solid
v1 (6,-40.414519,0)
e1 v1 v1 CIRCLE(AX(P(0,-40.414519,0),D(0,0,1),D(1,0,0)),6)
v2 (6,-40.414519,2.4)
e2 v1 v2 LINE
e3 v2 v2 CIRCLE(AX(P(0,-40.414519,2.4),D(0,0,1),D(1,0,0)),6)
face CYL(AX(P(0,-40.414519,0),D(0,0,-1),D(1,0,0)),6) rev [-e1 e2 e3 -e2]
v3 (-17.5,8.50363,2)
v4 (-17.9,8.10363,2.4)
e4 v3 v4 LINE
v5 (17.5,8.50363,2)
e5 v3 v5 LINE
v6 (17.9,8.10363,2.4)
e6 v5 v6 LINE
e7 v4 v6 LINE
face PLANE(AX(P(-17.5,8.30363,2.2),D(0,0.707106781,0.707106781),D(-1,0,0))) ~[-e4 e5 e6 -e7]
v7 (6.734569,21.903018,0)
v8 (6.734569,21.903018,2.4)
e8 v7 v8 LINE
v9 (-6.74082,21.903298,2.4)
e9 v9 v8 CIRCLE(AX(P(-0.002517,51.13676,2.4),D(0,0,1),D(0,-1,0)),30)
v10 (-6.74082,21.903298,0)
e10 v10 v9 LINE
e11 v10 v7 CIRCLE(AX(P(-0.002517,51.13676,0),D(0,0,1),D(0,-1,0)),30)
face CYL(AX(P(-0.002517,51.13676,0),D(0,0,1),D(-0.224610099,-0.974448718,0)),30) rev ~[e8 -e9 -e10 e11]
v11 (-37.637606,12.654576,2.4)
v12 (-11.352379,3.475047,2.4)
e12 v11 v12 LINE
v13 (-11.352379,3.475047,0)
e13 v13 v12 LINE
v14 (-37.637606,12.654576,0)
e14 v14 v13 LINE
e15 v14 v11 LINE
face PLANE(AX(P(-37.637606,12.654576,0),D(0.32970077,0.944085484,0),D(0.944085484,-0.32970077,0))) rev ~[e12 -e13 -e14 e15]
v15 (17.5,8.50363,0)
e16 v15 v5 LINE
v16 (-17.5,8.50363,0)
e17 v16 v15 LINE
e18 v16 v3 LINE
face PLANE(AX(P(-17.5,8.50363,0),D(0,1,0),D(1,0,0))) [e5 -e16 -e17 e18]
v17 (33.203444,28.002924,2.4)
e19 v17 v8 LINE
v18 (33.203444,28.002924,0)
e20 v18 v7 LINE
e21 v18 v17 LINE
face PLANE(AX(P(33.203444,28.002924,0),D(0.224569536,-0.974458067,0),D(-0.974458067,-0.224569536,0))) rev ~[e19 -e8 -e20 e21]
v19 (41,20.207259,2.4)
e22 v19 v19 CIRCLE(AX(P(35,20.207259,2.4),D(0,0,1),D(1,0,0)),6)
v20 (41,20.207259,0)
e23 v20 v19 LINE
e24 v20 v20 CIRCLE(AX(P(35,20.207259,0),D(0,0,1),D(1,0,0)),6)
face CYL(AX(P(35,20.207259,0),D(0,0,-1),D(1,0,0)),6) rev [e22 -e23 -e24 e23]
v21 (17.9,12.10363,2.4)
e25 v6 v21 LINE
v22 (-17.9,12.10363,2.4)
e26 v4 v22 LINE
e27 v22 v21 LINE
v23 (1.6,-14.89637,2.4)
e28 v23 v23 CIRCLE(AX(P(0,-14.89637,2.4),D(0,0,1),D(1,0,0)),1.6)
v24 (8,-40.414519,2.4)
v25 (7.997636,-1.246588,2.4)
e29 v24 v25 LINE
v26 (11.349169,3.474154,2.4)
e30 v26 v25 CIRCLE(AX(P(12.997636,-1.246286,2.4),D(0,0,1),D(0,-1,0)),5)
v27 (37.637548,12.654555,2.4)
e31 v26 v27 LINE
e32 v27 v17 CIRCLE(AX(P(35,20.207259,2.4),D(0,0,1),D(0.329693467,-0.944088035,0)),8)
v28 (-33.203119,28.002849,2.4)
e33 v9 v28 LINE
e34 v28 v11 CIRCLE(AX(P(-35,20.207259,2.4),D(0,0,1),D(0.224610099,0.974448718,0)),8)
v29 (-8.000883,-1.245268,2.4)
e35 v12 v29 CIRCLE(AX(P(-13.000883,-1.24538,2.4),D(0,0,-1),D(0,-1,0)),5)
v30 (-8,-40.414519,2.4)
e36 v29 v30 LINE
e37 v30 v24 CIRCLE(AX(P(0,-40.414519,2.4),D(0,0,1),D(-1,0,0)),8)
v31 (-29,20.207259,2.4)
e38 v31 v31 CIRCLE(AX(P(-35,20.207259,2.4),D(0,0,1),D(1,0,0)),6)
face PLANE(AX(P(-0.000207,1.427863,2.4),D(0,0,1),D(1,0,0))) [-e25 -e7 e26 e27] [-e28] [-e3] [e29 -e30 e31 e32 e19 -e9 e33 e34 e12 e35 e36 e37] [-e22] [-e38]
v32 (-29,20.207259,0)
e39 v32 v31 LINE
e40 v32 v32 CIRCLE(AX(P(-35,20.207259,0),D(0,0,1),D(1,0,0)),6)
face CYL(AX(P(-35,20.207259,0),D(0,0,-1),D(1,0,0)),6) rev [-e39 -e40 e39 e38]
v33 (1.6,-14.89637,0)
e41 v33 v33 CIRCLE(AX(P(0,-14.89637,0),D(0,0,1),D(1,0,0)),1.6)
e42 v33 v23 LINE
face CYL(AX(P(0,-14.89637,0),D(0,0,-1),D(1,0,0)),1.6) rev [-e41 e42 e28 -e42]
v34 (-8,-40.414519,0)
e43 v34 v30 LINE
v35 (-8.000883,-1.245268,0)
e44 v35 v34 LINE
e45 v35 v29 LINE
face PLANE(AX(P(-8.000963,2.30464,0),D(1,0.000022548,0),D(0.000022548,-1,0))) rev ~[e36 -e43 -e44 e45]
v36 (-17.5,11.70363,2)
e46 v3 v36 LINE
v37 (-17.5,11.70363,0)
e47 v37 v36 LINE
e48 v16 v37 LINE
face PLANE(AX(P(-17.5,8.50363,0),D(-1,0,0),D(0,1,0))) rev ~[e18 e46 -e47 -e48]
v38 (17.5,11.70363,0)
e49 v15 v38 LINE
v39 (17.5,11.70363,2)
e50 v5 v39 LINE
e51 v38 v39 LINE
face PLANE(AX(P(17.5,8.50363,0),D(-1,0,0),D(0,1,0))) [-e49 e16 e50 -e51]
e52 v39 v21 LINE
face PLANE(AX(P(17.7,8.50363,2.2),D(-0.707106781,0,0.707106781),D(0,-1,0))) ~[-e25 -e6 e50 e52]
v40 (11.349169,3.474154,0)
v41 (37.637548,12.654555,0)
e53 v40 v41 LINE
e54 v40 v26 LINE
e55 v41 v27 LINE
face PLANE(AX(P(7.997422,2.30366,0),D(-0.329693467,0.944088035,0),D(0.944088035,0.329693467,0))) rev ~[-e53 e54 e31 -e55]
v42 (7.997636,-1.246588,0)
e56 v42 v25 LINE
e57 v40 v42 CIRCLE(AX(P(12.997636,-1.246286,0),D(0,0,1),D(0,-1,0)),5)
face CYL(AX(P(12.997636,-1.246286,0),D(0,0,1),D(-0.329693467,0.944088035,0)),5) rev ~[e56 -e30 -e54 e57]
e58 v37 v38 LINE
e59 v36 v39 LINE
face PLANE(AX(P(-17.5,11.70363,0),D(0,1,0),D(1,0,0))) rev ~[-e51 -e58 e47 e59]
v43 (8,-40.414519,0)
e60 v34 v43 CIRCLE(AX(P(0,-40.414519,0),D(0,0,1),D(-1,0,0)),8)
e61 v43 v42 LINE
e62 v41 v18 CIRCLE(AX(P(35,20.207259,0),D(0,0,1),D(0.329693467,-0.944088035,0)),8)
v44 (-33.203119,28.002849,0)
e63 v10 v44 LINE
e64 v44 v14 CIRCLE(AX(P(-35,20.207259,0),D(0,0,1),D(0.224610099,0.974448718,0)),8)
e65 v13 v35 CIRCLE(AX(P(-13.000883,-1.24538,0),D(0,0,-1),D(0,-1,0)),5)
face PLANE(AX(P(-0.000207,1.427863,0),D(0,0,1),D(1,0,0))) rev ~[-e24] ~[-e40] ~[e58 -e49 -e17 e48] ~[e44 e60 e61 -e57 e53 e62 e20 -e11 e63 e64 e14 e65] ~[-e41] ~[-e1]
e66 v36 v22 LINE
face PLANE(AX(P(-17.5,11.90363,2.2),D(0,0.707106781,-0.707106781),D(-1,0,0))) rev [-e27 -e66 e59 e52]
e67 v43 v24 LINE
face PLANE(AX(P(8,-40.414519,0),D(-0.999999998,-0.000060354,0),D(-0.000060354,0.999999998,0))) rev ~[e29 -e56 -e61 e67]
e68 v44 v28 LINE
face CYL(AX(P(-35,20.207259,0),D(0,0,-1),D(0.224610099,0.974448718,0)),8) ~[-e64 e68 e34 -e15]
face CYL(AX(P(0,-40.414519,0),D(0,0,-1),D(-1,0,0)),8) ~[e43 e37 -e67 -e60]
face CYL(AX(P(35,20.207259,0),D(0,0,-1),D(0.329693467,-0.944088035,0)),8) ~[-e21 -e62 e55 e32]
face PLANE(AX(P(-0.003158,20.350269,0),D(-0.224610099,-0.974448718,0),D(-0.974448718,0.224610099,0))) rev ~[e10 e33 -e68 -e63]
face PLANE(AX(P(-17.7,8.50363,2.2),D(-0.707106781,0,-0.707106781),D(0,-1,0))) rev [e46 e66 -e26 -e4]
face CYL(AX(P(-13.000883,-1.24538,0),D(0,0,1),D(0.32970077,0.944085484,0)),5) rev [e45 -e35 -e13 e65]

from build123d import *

# Parameters (mm, degrees)
F0_R     = 6
F0_R_2   = 1.6
F0_W     = 35
F0_H     = 3.2
F1_DEPTH = 2.4
F2_SIZE  = 0.4
F3_R     = 30
F4_R     = 5


with BuildPart() as f1:
    # F0 (on Top) → F1 (new body)
    with BuildSketch(Plane.XY):
        with BuildLine():
            Line((-8.000963252, 2.3046399066), (-8, -40.4145188433))
            ThreePointArc((-8, -40.4145188433), (0, -48.4145188433), (8, -40.4145188433))
            Line((8, -40.4145188433), (7.9974217916, 2.303660399))
            Line((7.9974217916, 2.303660399), (37.6375477343, 12.6545551411))
            ThreePointArc((37.6375477343, 12.6545551411), (42.6856959969, 22.427637102), (33.2034437111, 28.002923954))
            Line((33.2034437111, 28.002923954), (-0.0031576851, 20.3502692862))
            Line((-0.0031576851, 20.3502692862), (-33.2031192071, 28.002849163))
            ThreePointArc((-33.2031192071, 28.002849163), (-42.6856411927, 22.4278267944), (-37.6376061638, 12.654575546))
            Line((-37.6376061638, 12.654575546), (-8.000963252, 2.3046399066))
        make_face()
        with Locations((0, -40.4145188433)):
            Circle(F0_R, mode=Mode.SUBTRACT)
        with Locations((0, -14.8963702892)):
            Circle(F0_R_2, mode=Mode.SUBTRACT)
        with Locations((-35, 20.2072594216)):
            Circle(F0_R, mode=Mode.SUBTRACT)
        with Locations((0, 10.1036297108)):
            Rectangle(F0_W, F0_H, mode=Mode.SUBTRACT)
        with Locations((35, 20.2072594216)):
            Circle(F0_R, mode=Mode.SUBTRACT)
    extrude(amount=F1_DEPTH)

    # F2
    f2_edges = [f1.edges().sort_by_distance(p)[0] for p in [
        (-17.5, 10.10363, 2.4),
        (0, 11.70363, 2.4),
        (0, 8.50363, 2.4),
        (17.5, 10.10363, 2.4),
    ]]
    chamfer(f2_edges, length=F2_SIZE)

    # F3
    f3_edges = [f1.edges().sort_by_distance(p)[0] for p in [
        (-0.003158, 20.350269, 1.2),
    ]]
    fillet(f3_edges, radius=F3_R)

    # F4
    f4_edges = [f1.edges().sort_by_distance(p)[0] for p in [
        (7.997422, 2.30366, 1.2),
        (-8.000963, 2.30464, 1.2),
    ]]
    fillet(f4_edges, radius=F4_R)


solid = f1.part
